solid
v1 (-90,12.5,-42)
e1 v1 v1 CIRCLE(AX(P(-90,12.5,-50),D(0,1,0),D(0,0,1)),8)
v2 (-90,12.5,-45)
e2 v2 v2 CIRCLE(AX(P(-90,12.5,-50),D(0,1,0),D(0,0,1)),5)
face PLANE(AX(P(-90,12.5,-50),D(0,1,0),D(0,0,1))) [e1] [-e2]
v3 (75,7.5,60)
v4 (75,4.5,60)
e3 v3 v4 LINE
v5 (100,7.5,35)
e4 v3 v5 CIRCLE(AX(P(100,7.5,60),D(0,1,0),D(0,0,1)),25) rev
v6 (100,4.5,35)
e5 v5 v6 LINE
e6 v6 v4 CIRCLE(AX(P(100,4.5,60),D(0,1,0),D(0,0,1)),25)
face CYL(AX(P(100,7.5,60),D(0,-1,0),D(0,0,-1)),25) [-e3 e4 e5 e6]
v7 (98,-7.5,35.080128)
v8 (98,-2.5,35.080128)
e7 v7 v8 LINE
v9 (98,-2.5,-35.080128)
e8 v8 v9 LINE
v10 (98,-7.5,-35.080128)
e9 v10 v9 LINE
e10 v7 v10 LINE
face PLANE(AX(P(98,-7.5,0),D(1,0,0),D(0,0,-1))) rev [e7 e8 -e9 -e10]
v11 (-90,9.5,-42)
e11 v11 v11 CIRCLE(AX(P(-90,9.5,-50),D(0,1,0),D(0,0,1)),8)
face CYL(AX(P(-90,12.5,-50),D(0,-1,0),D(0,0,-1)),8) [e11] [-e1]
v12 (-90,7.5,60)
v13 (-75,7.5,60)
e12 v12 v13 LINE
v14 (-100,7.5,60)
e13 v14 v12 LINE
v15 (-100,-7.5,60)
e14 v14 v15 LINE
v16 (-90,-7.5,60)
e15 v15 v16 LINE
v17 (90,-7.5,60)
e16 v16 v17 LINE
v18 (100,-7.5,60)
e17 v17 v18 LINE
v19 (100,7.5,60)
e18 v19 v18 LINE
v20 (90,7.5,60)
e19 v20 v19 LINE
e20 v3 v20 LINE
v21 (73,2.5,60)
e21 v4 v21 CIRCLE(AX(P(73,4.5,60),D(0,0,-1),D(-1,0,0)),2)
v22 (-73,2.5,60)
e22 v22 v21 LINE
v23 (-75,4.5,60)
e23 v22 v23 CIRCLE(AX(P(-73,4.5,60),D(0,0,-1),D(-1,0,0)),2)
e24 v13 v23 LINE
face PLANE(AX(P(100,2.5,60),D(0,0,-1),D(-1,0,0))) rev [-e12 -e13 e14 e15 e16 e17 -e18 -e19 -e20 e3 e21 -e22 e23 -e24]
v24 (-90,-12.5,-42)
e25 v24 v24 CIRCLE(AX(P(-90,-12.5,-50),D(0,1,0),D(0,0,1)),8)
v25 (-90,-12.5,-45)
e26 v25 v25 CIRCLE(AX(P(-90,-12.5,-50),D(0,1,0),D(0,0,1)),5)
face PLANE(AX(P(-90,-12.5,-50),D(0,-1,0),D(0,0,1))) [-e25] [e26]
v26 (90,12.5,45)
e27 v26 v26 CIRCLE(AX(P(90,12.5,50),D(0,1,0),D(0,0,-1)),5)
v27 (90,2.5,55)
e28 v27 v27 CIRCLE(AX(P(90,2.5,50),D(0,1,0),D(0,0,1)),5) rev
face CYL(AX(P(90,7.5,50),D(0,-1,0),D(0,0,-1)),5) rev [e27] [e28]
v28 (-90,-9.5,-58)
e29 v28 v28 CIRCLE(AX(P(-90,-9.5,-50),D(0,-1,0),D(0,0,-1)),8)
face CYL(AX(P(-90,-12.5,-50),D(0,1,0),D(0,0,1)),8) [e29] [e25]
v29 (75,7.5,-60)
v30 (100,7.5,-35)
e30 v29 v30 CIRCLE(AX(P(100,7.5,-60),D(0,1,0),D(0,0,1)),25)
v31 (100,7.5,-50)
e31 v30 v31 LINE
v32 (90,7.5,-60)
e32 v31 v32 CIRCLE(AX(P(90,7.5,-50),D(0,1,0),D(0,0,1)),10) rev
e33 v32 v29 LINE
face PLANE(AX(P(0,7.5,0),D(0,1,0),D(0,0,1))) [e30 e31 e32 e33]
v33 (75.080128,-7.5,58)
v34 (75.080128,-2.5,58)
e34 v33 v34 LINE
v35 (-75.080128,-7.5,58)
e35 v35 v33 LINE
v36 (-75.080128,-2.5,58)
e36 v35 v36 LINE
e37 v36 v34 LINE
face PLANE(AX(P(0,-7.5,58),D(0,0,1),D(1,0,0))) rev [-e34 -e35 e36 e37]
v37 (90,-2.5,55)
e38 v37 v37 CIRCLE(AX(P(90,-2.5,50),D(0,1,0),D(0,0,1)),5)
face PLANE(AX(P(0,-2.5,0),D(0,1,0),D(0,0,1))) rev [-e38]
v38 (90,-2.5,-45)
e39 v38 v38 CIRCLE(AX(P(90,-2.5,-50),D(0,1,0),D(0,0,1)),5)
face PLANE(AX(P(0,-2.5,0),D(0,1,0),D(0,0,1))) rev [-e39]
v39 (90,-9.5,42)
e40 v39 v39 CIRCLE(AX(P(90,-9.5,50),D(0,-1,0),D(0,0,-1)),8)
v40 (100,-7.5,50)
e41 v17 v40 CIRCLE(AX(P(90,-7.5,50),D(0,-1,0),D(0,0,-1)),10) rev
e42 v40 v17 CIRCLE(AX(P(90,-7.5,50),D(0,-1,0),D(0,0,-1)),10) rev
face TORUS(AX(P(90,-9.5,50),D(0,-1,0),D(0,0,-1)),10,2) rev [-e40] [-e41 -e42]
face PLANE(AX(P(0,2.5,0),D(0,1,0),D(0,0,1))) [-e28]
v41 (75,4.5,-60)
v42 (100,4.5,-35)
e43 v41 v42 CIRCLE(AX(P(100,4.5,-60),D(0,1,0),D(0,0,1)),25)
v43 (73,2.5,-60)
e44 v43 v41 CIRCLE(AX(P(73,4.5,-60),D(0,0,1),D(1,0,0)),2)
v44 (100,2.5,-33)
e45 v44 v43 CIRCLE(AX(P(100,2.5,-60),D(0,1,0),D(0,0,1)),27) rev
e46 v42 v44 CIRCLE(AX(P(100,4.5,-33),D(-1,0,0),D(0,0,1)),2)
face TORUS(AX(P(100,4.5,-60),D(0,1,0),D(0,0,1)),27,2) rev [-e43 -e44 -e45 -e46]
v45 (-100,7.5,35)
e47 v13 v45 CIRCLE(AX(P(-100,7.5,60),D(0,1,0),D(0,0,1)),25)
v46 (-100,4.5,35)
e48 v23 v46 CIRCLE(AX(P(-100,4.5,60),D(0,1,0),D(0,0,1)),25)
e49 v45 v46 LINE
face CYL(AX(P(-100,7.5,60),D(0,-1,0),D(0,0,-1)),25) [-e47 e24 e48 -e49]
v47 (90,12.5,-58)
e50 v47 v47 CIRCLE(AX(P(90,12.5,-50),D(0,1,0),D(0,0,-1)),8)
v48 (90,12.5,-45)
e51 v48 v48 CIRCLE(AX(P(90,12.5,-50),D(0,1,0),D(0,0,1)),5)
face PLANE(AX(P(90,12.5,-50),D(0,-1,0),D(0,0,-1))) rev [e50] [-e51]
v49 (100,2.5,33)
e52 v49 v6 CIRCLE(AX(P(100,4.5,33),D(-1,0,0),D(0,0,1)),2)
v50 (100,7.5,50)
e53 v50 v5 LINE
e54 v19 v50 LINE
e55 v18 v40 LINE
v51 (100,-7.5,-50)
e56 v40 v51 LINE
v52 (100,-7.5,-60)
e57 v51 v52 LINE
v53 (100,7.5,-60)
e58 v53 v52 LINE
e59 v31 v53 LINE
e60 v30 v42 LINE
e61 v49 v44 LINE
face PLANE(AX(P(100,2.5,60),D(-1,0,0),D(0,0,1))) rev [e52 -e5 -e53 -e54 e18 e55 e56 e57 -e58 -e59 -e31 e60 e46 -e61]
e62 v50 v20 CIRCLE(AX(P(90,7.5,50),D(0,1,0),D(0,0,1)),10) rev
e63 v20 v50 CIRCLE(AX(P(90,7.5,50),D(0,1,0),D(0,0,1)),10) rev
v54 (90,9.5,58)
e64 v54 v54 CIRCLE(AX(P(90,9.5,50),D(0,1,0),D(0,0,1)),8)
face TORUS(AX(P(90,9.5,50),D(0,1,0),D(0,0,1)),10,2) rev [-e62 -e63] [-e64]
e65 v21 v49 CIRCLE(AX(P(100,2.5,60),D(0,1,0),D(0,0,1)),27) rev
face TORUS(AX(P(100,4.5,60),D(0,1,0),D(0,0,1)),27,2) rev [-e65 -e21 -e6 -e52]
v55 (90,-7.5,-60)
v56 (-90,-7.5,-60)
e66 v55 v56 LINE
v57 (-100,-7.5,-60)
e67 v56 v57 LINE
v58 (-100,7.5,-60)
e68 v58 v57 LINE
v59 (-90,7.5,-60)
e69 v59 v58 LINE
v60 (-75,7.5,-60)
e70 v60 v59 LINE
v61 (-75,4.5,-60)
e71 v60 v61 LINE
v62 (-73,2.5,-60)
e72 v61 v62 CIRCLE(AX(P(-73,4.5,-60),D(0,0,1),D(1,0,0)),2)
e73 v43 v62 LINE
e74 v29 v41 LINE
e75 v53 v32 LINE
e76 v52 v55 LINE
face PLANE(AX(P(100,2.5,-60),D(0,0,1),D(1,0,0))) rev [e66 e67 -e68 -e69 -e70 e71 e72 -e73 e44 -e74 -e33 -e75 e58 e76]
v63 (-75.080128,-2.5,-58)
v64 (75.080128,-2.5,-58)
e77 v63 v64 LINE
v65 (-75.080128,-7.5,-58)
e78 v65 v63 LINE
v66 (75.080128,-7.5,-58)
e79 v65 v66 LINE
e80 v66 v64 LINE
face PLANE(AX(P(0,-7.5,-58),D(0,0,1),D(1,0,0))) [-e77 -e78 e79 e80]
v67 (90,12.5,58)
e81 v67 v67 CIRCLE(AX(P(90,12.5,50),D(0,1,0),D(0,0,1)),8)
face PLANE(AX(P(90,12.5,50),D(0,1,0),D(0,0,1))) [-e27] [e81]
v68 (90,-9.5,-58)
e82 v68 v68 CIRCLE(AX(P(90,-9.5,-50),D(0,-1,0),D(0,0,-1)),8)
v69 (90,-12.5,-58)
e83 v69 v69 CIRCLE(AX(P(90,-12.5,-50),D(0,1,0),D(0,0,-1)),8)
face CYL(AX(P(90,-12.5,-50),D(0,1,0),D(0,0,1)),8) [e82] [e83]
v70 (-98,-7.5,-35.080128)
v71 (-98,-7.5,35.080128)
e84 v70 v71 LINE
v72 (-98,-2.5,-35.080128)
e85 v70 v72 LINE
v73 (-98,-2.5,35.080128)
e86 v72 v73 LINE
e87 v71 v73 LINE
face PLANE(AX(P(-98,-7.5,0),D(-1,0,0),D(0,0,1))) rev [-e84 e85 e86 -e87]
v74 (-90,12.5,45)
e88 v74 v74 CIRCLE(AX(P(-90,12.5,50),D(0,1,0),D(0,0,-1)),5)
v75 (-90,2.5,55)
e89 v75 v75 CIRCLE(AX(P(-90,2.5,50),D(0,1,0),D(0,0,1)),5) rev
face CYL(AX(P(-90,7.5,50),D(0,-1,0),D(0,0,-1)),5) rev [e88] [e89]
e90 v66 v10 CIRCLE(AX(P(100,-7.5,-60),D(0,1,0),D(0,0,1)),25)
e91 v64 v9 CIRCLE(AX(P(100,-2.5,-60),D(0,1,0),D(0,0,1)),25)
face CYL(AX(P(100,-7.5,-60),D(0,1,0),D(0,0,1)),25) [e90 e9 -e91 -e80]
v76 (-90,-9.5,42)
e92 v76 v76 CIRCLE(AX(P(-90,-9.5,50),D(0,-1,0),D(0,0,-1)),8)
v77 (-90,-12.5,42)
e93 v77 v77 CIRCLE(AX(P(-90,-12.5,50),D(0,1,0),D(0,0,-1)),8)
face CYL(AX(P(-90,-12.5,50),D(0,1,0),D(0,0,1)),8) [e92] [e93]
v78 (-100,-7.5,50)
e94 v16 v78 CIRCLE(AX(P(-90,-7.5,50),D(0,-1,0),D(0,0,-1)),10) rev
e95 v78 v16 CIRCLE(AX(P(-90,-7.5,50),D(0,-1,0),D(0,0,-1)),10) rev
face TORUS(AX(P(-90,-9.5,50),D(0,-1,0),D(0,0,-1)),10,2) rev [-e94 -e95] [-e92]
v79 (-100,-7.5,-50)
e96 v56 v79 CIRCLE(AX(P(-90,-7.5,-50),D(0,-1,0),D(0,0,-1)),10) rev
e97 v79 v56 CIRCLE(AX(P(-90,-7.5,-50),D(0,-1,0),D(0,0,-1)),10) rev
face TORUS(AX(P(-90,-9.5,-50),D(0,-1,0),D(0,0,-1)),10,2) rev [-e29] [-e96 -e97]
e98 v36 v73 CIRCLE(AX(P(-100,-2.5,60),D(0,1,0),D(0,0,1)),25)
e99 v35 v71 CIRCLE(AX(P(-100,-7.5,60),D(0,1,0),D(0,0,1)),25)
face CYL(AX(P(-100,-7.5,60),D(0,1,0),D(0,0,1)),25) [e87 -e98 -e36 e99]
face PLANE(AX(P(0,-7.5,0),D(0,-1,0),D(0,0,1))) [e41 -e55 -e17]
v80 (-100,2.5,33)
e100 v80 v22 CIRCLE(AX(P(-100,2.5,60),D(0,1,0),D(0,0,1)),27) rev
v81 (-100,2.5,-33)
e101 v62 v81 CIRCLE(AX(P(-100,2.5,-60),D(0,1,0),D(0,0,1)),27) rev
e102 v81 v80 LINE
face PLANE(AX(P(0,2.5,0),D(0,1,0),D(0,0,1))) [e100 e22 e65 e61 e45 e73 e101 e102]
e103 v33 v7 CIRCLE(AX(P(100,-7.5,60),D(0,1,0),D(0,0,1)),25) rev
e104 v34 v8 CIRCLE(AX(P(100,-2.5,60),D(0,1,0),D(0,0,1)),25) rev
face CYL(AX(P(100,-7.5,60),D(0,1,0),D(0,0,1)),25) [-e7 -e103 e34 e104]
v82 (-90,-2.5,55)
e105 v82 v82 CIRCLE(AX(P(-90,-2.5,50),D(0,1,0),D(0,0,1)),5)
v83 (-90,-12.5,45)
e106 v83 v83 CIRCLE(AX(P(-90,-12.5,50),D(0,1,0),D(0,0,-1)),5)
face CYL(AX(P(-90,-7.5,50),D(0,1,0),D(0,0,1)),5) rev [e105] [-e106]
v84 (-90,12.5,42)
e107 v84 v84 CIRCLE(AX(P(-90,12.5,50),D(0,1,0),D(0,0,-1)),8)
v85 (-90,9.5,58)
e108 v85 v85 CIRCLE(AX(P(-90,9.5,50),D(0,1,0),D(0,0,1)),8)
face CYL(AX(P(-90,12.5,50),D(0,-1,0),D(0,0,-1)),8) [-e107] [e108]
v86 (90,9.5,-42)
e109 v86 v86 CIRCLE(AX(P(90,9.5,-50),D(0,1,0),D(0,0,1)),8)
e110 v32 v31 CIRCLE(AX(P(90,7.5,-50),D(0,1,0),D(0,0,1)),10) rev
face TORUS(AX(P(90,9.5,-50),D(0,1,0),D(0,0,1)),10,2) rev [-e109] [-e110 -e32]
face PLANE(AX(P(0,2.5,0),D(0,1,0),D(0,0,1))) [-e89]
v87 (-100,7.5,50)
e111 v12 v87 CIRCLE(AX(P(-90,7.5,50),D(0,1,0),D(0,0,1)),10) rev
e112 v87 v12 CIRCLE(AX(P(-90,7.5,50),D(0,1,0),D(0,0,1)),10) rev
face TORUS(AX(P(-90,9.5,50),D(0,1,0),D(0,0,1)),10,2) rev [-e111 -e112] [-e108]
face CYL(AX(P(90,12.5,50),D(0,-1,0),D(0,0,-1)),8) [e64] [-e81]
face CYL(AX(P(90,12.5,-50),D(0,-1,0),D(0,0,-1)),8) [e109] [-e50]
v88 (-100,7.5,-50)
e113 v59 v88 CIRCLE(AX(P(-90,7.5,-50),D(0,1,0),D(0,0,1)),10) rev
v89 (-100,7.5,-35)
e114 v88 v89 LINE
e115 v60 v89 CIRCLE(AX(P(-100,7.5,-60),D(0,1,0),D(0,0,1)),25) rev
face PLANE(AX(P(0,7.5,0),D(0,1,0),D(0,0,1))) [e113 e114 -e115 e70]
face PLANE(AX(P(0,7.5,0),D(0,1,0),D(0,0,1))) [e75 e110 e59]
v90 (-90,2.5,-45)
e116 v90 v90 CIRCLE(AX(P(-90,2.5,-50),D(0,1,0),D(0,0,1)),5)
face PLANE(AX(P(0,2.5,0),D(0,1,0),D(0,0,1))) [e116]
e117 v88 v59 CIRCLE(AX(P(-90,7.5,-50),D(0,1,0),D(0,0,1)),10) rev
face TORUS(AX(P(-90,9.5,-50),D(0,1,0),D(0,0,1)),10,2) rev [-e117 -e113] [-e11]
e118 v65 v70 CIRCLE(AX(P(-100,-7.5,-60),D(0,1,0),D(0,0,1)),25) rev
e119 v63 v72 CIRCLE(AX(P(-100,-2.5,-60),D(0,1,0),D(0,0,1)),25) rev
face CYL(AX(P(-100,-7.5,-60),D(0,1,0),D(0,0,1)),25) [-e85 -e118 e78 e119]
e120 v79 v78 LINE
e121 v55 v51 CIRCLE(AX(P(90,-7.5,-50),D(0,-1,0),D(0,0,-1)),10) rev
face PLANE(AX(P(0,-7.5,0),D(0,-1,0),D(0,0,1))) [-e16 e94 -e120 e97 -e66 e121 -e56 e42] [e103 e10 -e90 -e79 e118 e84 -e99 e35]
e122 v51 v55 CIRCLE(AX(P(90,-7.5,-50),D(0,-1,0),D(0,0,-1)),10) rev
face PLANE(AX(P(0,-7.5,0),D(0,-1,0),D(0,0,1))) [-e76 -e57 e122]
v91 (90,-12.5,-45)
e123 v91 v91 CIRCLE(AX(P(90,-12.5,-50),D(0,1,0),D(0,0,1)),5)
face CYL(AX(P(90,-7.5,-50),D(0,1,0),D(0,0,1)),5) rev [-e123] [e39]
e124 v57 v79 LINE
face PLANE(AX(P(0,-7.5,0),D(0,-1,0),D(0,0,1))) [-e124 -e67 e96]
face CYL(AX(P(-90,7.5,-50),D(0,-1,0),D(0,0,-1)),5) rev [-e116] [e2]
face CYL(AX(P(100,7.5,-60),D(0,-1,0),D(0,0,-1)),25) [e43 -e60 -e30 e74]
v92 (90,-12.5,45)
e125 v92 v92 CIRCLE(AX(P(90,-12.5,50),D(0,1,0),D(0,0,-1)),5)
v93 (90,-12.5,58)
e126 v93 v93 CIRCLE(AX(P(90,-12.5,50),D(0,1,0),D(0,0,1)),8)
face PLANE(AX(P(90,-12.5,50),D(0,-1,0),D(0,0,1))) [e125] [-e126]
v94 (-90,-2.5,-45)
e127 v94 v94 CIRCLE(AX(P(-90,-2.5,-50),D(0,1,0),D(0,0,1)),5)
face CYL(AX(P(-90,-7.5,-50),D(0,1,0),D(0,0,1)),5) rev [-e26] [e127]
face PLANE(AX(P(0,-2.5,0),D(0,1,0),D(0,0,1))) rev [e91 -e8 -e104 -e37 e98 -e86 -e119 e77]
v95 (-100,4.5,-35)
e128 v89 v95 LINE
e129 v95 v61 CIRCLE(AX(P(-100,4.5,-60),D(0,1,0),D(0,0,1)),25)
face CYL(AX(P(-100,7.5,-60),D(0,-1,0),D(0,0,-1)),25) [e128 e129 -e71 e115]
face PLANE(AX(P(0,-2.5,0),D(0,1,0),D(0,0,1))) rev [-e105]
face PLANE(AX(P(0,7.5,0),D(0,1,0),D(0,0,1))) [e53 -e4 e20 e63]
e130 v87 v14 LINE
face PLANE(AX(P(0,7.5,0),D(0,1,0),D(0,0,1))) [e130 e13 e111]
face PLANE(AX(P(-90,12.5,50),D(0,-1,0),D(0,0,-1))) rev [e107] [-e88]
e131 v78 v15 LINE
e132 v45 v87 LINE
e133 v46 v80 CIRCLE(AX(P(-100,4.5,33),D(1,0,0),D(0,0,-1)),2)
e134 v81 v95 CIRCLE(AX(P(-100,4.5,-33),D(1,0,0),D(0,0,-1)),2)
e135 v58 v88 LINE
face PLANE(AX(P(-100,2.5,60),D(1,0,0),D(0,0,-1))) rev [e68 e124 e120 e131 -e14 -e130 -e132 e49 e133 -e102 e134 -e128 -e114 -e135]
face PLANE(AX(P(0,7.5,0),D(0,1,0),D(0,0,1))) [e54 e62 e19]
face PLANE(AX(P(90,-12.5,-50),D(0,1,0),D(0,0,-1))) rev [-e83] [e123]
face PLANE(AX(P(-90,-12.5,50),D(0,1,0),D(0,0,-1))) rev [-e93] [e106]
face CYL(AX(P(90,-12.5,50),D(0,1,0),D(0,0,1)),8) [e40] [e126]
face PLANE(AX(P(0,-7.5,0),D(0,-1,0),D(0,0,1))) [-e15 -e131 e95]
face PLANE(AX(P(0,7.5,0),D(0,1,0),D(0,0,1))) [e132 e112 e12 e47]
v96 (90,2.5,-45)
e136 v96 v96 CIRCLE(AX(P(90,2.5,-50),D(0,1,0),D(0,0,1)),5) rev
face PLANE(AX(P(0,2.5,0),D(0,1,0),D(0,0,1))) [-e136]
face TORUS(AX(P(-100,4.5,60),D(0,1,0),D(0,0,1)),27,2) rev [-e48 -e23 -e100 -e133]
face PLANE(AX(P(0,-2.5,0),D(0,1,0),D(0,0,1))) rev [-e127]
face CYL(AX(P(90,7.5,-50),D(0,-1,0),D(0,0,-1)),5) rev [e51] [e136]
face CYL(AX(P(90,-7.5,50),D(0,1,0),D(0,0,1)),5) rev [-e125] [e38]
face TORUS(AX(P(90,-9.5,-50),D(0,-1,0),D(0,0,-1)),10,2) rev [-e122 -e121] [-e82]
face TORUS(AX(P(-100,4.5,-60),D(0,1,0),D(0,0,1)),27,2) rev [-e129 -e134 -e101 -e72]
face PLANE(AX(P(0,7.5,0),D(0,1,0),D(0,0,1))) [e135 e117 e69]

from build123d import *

# Parameters (mm, degrees)
SKETCH1_W           = 200
SKETCH1_H           = 120
BOSS_EXTRUDE3_DEPTH = 2.5
SKETCH3_R           = 5
BOSS_EXTRUDE4_DEPTH = 5
SKETCH4_R           = 8
SKETCH4_R_2         = 5
BOSS_EXTRUDE5_DEPTH = 5
FILLET1_R           = 2
FILLET2_R           = 2
BOSS_EXTRUDE6_DEPTH = 5


with BuildPart() as part:
    # Sketch1 → Boss-Extrude3 (new, symmetric)
    with BuildSketch(Plane(origin=(0, 0, 0), x_dir=(1, 0, 0), z_dir=(0, 1, 0))):
        Rectangle(SKETCH1_W, SKETCH1_H)
    extrude(amount=BOSS_EXTRUDE3_DEPTH, both=True)

    # Sketch3 → Boss-Extrude4 (add)
    # profile 1 of 4: a face of its own
    with BuildSketch(Plane(origin=(0, 2.5, 0), x_dir=(1, 0, 0), z_dir=(0, 1, 0))):
        with BuildLine():
            Line((-75, 60), (-100, 60))
            Line((-100, 60), (-100, 35))
            ThreePointArc((-100, 35), (-82.32233047, 42.32233047), (-75, 60))
        make_face()
        with Locations(Location((-90, 50, 0), (0, 0, 270))):
            Circle(SKETCH3_R, mode=Mode.SUBTRACT)
    # profile 2 of 4: a face of its own
    with BuildSketch(Plane(origin=(0, 2.5, 0), x_dir=(1, 0, 0), z_dir=(0, 1, 0))):
        with BuildLine():
            Line((100, 60), (75, 60))
            ThreePointArc((75, 60), (82.32233047, 42.32233047), (100, 35))
            Line((100, 35), (100, 60))
        make_face()
        with Locations(Location((90, 50, 0), (0, 0, 270))):
            Circle(SKETCH3_R, mode=Mode.SUBTRACT)
    # profile 3 of 4: a face of its own
    with BuildSketch(Plane(origin=(0, 2.5, 0), x_dir=(1, 0, 0), z_dir=(0, 1, 0))):
        with BuildLine():
            Line((100, -60), (100, -35))
            ThreePointArc((100, -35), (82.32233047, -42.32233047), (75, -60))
            Line((75, -60), (100, -60))
        make_face()
        with Locations(Location((90, -50, 0), (0, 0, 270))):
            Circle(SKETCH3_R, mode=Mode.SUBTRACT)
    # profile 4 of 4: a face of its own
    with BuildSketch(Plane(origin=(0, 2.5, 0), x_dir=(1, 0, 0), z_dir=(0, 1, 0))):
        with BuildLine():
            ThreePointArc((-75, -60), (-82.32233047, -42.32233047), (-100, -35))
            Line((-100, -35), (-100, -60))
            Line((-100, -60), (-75, -60))
        make_face()
        with Locations(Location((-90, -50, 0), (0, 0, 270))):
            Circle(SKETCH3_R, mode=Mode.SUBTRACT)
    boss_extrude4 = extrude(amount=BOSS_EXTRUDE4_DEPTH)

    # Sketch4 → Boss-Extrude5 (add)
    # profile 1 of 4: a face of its own
    with BuildSketch(Plane(origin=(0, 7.5, 0), x_dir=(1, 0, 0), z_dir=(0, 1, 0))):
        with Locations(Location((-90, 50, 0), (0, 0, 270))):
            Circle(SKETCH4_R)
        with Locations(Location((-90, 50, 0), (0, 0, 270))):
            Circle(SKETCH4_R_2, mode=Mode.SUBTRACT)
    # profile 2 of 4: a face of its own
    with BuildSketch(Plane(origin=(0, 7.5, 0), x_dir=(1, 0, 0), z_dir=(0, 1, 0))):
        with Locations(Location((90, 50, 0), (0, 0, 90))):
            Circle(SKETCH4_R)
        with Locations(Location((90, 50, 0), (0, 0, 270))):
            Circle(SKETCH4_R_2, mode=Mode.SUBTRACT)
    # profile 3 of 4: a face of its own
    with BuildSketch(Plane(origin=(0, 7.5, 0), x_dir=(1, 0, 0), z_dir=(0, 1, 0))):
        with Locations(Location((90, -50, 0), (0, 0, 270))):
            Circle(SKETCH4_R)
        with Locations(Location((90, -50, 0), (0, 0, 90))):
            Circle(SKETCH4_R_2, mode=Mode.SUBTRACT)
    # profile 4 of 4: a face of its own
    with BuildSketch(Plane(origin=(0, 7.5, 0), x_dir=(1, 0, 0), z_dir=(0, 1, 0))):
        with Locations(Location((-90, -50, 0), (0, 0, 90))):
            Circle(SKETCH4_R)
        with Locations(Location((-90, -50, 0), (0, 0, 90))):
            Circle(SKETCH4_R_2, mode=Mode.SUBTRACT)
    boss_extrude5 = extrude(amount=BOSS_EXTRUDE5_DEPTH)

    # Fillet1
    fillet1_edges = [part.edges().sort_by_distance(p)[0] for p in [
        (-82.32233047, 2.5, -42.32233047),
        (82.32233047, 2.5, -42.32233047),
        (82.32233047, 2.5, 42.32233047),
        (-82.32233047, 2.5, 42.32233047),
        (-90, 7.5, -58),
        (90, 7.5, -42),
        (90, 7.5, 42),
        (-90, 7.5, 58),
    ]]
    fillet(fillet1_edges, radius=FILLET1_R - 0.0001)  # a hair under: the kernel refuses the full size

    # Mirror2: Boss-Extrude4, Boss-Extrude5 across plane
    add(boss_extrude4.mirror(Plane.ZX))
    add(boss_extrude5.mirror(Plane.ZX))

    # Fillet2
    fillet2_edges = [part.edges().sort_by_distance(p)[0] for p in [
        (-90, -7.5, -58),
        (90, -7.5, -42),
        (90, -7.5, 42),
        (-90, -7.5, 58),
    ]]
    fillet(fillet2_edges, radius=FILLET2_R - 0.0001)  # a hair under: the kernel refuses the full size

    # Sketch7 → Boss-Extrude6 (add)
    with BuildSketch(Plane.XZ.offset(2.5)):
        with BuildLine():
            ThreePointArc((-98, 35.080128411), (-98.999197752, 35.020040135), (-100, 35))
            Line((-100, 35), (-100, -35))
            ThreePointArc((-100, -35), (-98.999197752, -35.020040135), (-98, -35.080128411))
            Line((-98, -35.080128411), (-98, 35.080128411))
        make_face()
        with BuildLine():
            Line((75, 60), (-75, 60))
            ThreePointArc((-75, 60), (-75.020040135, 58.999197752), (-75.080128411, 58))
            Line((-75.080128411, 58), (-75, 58))
            Line((-75, 58), (75, 58))
            Line((75, 58), (75.080128411, 58))
            ThreePointArc((75.080128411, 58), (75.020040135, 58.999197752), (75, 60))
        make_face()
        with BuildLine():
            Line((100, -35), (100, 35))
            ThreePointArc((100, 35), (98.999197752, 35.020040135), (98, 35.080128411))
            Line((98, 35.080128411), (98, -35.080128411))
            ThreePointArc((98, -35.080128411), (98.999197752, -35.020040135), (100, -35))
        make_face()
        with BuildLine():
            Line((75.080128411, -58), (-75.080128411, -58))
            ThreePointArc((-75.080128411, -58), (-75.020040135, -58.999197752), (-75, -60))
            Line((-75, -60), (75, -60))
            ThreePointArc((75, -60), (75.020040135, -58.999197752), (75.080128411, -58))
        make_face()
    extrude(amount=BOSS_EXTRUDE6_DEPTH)


solid = part.part
